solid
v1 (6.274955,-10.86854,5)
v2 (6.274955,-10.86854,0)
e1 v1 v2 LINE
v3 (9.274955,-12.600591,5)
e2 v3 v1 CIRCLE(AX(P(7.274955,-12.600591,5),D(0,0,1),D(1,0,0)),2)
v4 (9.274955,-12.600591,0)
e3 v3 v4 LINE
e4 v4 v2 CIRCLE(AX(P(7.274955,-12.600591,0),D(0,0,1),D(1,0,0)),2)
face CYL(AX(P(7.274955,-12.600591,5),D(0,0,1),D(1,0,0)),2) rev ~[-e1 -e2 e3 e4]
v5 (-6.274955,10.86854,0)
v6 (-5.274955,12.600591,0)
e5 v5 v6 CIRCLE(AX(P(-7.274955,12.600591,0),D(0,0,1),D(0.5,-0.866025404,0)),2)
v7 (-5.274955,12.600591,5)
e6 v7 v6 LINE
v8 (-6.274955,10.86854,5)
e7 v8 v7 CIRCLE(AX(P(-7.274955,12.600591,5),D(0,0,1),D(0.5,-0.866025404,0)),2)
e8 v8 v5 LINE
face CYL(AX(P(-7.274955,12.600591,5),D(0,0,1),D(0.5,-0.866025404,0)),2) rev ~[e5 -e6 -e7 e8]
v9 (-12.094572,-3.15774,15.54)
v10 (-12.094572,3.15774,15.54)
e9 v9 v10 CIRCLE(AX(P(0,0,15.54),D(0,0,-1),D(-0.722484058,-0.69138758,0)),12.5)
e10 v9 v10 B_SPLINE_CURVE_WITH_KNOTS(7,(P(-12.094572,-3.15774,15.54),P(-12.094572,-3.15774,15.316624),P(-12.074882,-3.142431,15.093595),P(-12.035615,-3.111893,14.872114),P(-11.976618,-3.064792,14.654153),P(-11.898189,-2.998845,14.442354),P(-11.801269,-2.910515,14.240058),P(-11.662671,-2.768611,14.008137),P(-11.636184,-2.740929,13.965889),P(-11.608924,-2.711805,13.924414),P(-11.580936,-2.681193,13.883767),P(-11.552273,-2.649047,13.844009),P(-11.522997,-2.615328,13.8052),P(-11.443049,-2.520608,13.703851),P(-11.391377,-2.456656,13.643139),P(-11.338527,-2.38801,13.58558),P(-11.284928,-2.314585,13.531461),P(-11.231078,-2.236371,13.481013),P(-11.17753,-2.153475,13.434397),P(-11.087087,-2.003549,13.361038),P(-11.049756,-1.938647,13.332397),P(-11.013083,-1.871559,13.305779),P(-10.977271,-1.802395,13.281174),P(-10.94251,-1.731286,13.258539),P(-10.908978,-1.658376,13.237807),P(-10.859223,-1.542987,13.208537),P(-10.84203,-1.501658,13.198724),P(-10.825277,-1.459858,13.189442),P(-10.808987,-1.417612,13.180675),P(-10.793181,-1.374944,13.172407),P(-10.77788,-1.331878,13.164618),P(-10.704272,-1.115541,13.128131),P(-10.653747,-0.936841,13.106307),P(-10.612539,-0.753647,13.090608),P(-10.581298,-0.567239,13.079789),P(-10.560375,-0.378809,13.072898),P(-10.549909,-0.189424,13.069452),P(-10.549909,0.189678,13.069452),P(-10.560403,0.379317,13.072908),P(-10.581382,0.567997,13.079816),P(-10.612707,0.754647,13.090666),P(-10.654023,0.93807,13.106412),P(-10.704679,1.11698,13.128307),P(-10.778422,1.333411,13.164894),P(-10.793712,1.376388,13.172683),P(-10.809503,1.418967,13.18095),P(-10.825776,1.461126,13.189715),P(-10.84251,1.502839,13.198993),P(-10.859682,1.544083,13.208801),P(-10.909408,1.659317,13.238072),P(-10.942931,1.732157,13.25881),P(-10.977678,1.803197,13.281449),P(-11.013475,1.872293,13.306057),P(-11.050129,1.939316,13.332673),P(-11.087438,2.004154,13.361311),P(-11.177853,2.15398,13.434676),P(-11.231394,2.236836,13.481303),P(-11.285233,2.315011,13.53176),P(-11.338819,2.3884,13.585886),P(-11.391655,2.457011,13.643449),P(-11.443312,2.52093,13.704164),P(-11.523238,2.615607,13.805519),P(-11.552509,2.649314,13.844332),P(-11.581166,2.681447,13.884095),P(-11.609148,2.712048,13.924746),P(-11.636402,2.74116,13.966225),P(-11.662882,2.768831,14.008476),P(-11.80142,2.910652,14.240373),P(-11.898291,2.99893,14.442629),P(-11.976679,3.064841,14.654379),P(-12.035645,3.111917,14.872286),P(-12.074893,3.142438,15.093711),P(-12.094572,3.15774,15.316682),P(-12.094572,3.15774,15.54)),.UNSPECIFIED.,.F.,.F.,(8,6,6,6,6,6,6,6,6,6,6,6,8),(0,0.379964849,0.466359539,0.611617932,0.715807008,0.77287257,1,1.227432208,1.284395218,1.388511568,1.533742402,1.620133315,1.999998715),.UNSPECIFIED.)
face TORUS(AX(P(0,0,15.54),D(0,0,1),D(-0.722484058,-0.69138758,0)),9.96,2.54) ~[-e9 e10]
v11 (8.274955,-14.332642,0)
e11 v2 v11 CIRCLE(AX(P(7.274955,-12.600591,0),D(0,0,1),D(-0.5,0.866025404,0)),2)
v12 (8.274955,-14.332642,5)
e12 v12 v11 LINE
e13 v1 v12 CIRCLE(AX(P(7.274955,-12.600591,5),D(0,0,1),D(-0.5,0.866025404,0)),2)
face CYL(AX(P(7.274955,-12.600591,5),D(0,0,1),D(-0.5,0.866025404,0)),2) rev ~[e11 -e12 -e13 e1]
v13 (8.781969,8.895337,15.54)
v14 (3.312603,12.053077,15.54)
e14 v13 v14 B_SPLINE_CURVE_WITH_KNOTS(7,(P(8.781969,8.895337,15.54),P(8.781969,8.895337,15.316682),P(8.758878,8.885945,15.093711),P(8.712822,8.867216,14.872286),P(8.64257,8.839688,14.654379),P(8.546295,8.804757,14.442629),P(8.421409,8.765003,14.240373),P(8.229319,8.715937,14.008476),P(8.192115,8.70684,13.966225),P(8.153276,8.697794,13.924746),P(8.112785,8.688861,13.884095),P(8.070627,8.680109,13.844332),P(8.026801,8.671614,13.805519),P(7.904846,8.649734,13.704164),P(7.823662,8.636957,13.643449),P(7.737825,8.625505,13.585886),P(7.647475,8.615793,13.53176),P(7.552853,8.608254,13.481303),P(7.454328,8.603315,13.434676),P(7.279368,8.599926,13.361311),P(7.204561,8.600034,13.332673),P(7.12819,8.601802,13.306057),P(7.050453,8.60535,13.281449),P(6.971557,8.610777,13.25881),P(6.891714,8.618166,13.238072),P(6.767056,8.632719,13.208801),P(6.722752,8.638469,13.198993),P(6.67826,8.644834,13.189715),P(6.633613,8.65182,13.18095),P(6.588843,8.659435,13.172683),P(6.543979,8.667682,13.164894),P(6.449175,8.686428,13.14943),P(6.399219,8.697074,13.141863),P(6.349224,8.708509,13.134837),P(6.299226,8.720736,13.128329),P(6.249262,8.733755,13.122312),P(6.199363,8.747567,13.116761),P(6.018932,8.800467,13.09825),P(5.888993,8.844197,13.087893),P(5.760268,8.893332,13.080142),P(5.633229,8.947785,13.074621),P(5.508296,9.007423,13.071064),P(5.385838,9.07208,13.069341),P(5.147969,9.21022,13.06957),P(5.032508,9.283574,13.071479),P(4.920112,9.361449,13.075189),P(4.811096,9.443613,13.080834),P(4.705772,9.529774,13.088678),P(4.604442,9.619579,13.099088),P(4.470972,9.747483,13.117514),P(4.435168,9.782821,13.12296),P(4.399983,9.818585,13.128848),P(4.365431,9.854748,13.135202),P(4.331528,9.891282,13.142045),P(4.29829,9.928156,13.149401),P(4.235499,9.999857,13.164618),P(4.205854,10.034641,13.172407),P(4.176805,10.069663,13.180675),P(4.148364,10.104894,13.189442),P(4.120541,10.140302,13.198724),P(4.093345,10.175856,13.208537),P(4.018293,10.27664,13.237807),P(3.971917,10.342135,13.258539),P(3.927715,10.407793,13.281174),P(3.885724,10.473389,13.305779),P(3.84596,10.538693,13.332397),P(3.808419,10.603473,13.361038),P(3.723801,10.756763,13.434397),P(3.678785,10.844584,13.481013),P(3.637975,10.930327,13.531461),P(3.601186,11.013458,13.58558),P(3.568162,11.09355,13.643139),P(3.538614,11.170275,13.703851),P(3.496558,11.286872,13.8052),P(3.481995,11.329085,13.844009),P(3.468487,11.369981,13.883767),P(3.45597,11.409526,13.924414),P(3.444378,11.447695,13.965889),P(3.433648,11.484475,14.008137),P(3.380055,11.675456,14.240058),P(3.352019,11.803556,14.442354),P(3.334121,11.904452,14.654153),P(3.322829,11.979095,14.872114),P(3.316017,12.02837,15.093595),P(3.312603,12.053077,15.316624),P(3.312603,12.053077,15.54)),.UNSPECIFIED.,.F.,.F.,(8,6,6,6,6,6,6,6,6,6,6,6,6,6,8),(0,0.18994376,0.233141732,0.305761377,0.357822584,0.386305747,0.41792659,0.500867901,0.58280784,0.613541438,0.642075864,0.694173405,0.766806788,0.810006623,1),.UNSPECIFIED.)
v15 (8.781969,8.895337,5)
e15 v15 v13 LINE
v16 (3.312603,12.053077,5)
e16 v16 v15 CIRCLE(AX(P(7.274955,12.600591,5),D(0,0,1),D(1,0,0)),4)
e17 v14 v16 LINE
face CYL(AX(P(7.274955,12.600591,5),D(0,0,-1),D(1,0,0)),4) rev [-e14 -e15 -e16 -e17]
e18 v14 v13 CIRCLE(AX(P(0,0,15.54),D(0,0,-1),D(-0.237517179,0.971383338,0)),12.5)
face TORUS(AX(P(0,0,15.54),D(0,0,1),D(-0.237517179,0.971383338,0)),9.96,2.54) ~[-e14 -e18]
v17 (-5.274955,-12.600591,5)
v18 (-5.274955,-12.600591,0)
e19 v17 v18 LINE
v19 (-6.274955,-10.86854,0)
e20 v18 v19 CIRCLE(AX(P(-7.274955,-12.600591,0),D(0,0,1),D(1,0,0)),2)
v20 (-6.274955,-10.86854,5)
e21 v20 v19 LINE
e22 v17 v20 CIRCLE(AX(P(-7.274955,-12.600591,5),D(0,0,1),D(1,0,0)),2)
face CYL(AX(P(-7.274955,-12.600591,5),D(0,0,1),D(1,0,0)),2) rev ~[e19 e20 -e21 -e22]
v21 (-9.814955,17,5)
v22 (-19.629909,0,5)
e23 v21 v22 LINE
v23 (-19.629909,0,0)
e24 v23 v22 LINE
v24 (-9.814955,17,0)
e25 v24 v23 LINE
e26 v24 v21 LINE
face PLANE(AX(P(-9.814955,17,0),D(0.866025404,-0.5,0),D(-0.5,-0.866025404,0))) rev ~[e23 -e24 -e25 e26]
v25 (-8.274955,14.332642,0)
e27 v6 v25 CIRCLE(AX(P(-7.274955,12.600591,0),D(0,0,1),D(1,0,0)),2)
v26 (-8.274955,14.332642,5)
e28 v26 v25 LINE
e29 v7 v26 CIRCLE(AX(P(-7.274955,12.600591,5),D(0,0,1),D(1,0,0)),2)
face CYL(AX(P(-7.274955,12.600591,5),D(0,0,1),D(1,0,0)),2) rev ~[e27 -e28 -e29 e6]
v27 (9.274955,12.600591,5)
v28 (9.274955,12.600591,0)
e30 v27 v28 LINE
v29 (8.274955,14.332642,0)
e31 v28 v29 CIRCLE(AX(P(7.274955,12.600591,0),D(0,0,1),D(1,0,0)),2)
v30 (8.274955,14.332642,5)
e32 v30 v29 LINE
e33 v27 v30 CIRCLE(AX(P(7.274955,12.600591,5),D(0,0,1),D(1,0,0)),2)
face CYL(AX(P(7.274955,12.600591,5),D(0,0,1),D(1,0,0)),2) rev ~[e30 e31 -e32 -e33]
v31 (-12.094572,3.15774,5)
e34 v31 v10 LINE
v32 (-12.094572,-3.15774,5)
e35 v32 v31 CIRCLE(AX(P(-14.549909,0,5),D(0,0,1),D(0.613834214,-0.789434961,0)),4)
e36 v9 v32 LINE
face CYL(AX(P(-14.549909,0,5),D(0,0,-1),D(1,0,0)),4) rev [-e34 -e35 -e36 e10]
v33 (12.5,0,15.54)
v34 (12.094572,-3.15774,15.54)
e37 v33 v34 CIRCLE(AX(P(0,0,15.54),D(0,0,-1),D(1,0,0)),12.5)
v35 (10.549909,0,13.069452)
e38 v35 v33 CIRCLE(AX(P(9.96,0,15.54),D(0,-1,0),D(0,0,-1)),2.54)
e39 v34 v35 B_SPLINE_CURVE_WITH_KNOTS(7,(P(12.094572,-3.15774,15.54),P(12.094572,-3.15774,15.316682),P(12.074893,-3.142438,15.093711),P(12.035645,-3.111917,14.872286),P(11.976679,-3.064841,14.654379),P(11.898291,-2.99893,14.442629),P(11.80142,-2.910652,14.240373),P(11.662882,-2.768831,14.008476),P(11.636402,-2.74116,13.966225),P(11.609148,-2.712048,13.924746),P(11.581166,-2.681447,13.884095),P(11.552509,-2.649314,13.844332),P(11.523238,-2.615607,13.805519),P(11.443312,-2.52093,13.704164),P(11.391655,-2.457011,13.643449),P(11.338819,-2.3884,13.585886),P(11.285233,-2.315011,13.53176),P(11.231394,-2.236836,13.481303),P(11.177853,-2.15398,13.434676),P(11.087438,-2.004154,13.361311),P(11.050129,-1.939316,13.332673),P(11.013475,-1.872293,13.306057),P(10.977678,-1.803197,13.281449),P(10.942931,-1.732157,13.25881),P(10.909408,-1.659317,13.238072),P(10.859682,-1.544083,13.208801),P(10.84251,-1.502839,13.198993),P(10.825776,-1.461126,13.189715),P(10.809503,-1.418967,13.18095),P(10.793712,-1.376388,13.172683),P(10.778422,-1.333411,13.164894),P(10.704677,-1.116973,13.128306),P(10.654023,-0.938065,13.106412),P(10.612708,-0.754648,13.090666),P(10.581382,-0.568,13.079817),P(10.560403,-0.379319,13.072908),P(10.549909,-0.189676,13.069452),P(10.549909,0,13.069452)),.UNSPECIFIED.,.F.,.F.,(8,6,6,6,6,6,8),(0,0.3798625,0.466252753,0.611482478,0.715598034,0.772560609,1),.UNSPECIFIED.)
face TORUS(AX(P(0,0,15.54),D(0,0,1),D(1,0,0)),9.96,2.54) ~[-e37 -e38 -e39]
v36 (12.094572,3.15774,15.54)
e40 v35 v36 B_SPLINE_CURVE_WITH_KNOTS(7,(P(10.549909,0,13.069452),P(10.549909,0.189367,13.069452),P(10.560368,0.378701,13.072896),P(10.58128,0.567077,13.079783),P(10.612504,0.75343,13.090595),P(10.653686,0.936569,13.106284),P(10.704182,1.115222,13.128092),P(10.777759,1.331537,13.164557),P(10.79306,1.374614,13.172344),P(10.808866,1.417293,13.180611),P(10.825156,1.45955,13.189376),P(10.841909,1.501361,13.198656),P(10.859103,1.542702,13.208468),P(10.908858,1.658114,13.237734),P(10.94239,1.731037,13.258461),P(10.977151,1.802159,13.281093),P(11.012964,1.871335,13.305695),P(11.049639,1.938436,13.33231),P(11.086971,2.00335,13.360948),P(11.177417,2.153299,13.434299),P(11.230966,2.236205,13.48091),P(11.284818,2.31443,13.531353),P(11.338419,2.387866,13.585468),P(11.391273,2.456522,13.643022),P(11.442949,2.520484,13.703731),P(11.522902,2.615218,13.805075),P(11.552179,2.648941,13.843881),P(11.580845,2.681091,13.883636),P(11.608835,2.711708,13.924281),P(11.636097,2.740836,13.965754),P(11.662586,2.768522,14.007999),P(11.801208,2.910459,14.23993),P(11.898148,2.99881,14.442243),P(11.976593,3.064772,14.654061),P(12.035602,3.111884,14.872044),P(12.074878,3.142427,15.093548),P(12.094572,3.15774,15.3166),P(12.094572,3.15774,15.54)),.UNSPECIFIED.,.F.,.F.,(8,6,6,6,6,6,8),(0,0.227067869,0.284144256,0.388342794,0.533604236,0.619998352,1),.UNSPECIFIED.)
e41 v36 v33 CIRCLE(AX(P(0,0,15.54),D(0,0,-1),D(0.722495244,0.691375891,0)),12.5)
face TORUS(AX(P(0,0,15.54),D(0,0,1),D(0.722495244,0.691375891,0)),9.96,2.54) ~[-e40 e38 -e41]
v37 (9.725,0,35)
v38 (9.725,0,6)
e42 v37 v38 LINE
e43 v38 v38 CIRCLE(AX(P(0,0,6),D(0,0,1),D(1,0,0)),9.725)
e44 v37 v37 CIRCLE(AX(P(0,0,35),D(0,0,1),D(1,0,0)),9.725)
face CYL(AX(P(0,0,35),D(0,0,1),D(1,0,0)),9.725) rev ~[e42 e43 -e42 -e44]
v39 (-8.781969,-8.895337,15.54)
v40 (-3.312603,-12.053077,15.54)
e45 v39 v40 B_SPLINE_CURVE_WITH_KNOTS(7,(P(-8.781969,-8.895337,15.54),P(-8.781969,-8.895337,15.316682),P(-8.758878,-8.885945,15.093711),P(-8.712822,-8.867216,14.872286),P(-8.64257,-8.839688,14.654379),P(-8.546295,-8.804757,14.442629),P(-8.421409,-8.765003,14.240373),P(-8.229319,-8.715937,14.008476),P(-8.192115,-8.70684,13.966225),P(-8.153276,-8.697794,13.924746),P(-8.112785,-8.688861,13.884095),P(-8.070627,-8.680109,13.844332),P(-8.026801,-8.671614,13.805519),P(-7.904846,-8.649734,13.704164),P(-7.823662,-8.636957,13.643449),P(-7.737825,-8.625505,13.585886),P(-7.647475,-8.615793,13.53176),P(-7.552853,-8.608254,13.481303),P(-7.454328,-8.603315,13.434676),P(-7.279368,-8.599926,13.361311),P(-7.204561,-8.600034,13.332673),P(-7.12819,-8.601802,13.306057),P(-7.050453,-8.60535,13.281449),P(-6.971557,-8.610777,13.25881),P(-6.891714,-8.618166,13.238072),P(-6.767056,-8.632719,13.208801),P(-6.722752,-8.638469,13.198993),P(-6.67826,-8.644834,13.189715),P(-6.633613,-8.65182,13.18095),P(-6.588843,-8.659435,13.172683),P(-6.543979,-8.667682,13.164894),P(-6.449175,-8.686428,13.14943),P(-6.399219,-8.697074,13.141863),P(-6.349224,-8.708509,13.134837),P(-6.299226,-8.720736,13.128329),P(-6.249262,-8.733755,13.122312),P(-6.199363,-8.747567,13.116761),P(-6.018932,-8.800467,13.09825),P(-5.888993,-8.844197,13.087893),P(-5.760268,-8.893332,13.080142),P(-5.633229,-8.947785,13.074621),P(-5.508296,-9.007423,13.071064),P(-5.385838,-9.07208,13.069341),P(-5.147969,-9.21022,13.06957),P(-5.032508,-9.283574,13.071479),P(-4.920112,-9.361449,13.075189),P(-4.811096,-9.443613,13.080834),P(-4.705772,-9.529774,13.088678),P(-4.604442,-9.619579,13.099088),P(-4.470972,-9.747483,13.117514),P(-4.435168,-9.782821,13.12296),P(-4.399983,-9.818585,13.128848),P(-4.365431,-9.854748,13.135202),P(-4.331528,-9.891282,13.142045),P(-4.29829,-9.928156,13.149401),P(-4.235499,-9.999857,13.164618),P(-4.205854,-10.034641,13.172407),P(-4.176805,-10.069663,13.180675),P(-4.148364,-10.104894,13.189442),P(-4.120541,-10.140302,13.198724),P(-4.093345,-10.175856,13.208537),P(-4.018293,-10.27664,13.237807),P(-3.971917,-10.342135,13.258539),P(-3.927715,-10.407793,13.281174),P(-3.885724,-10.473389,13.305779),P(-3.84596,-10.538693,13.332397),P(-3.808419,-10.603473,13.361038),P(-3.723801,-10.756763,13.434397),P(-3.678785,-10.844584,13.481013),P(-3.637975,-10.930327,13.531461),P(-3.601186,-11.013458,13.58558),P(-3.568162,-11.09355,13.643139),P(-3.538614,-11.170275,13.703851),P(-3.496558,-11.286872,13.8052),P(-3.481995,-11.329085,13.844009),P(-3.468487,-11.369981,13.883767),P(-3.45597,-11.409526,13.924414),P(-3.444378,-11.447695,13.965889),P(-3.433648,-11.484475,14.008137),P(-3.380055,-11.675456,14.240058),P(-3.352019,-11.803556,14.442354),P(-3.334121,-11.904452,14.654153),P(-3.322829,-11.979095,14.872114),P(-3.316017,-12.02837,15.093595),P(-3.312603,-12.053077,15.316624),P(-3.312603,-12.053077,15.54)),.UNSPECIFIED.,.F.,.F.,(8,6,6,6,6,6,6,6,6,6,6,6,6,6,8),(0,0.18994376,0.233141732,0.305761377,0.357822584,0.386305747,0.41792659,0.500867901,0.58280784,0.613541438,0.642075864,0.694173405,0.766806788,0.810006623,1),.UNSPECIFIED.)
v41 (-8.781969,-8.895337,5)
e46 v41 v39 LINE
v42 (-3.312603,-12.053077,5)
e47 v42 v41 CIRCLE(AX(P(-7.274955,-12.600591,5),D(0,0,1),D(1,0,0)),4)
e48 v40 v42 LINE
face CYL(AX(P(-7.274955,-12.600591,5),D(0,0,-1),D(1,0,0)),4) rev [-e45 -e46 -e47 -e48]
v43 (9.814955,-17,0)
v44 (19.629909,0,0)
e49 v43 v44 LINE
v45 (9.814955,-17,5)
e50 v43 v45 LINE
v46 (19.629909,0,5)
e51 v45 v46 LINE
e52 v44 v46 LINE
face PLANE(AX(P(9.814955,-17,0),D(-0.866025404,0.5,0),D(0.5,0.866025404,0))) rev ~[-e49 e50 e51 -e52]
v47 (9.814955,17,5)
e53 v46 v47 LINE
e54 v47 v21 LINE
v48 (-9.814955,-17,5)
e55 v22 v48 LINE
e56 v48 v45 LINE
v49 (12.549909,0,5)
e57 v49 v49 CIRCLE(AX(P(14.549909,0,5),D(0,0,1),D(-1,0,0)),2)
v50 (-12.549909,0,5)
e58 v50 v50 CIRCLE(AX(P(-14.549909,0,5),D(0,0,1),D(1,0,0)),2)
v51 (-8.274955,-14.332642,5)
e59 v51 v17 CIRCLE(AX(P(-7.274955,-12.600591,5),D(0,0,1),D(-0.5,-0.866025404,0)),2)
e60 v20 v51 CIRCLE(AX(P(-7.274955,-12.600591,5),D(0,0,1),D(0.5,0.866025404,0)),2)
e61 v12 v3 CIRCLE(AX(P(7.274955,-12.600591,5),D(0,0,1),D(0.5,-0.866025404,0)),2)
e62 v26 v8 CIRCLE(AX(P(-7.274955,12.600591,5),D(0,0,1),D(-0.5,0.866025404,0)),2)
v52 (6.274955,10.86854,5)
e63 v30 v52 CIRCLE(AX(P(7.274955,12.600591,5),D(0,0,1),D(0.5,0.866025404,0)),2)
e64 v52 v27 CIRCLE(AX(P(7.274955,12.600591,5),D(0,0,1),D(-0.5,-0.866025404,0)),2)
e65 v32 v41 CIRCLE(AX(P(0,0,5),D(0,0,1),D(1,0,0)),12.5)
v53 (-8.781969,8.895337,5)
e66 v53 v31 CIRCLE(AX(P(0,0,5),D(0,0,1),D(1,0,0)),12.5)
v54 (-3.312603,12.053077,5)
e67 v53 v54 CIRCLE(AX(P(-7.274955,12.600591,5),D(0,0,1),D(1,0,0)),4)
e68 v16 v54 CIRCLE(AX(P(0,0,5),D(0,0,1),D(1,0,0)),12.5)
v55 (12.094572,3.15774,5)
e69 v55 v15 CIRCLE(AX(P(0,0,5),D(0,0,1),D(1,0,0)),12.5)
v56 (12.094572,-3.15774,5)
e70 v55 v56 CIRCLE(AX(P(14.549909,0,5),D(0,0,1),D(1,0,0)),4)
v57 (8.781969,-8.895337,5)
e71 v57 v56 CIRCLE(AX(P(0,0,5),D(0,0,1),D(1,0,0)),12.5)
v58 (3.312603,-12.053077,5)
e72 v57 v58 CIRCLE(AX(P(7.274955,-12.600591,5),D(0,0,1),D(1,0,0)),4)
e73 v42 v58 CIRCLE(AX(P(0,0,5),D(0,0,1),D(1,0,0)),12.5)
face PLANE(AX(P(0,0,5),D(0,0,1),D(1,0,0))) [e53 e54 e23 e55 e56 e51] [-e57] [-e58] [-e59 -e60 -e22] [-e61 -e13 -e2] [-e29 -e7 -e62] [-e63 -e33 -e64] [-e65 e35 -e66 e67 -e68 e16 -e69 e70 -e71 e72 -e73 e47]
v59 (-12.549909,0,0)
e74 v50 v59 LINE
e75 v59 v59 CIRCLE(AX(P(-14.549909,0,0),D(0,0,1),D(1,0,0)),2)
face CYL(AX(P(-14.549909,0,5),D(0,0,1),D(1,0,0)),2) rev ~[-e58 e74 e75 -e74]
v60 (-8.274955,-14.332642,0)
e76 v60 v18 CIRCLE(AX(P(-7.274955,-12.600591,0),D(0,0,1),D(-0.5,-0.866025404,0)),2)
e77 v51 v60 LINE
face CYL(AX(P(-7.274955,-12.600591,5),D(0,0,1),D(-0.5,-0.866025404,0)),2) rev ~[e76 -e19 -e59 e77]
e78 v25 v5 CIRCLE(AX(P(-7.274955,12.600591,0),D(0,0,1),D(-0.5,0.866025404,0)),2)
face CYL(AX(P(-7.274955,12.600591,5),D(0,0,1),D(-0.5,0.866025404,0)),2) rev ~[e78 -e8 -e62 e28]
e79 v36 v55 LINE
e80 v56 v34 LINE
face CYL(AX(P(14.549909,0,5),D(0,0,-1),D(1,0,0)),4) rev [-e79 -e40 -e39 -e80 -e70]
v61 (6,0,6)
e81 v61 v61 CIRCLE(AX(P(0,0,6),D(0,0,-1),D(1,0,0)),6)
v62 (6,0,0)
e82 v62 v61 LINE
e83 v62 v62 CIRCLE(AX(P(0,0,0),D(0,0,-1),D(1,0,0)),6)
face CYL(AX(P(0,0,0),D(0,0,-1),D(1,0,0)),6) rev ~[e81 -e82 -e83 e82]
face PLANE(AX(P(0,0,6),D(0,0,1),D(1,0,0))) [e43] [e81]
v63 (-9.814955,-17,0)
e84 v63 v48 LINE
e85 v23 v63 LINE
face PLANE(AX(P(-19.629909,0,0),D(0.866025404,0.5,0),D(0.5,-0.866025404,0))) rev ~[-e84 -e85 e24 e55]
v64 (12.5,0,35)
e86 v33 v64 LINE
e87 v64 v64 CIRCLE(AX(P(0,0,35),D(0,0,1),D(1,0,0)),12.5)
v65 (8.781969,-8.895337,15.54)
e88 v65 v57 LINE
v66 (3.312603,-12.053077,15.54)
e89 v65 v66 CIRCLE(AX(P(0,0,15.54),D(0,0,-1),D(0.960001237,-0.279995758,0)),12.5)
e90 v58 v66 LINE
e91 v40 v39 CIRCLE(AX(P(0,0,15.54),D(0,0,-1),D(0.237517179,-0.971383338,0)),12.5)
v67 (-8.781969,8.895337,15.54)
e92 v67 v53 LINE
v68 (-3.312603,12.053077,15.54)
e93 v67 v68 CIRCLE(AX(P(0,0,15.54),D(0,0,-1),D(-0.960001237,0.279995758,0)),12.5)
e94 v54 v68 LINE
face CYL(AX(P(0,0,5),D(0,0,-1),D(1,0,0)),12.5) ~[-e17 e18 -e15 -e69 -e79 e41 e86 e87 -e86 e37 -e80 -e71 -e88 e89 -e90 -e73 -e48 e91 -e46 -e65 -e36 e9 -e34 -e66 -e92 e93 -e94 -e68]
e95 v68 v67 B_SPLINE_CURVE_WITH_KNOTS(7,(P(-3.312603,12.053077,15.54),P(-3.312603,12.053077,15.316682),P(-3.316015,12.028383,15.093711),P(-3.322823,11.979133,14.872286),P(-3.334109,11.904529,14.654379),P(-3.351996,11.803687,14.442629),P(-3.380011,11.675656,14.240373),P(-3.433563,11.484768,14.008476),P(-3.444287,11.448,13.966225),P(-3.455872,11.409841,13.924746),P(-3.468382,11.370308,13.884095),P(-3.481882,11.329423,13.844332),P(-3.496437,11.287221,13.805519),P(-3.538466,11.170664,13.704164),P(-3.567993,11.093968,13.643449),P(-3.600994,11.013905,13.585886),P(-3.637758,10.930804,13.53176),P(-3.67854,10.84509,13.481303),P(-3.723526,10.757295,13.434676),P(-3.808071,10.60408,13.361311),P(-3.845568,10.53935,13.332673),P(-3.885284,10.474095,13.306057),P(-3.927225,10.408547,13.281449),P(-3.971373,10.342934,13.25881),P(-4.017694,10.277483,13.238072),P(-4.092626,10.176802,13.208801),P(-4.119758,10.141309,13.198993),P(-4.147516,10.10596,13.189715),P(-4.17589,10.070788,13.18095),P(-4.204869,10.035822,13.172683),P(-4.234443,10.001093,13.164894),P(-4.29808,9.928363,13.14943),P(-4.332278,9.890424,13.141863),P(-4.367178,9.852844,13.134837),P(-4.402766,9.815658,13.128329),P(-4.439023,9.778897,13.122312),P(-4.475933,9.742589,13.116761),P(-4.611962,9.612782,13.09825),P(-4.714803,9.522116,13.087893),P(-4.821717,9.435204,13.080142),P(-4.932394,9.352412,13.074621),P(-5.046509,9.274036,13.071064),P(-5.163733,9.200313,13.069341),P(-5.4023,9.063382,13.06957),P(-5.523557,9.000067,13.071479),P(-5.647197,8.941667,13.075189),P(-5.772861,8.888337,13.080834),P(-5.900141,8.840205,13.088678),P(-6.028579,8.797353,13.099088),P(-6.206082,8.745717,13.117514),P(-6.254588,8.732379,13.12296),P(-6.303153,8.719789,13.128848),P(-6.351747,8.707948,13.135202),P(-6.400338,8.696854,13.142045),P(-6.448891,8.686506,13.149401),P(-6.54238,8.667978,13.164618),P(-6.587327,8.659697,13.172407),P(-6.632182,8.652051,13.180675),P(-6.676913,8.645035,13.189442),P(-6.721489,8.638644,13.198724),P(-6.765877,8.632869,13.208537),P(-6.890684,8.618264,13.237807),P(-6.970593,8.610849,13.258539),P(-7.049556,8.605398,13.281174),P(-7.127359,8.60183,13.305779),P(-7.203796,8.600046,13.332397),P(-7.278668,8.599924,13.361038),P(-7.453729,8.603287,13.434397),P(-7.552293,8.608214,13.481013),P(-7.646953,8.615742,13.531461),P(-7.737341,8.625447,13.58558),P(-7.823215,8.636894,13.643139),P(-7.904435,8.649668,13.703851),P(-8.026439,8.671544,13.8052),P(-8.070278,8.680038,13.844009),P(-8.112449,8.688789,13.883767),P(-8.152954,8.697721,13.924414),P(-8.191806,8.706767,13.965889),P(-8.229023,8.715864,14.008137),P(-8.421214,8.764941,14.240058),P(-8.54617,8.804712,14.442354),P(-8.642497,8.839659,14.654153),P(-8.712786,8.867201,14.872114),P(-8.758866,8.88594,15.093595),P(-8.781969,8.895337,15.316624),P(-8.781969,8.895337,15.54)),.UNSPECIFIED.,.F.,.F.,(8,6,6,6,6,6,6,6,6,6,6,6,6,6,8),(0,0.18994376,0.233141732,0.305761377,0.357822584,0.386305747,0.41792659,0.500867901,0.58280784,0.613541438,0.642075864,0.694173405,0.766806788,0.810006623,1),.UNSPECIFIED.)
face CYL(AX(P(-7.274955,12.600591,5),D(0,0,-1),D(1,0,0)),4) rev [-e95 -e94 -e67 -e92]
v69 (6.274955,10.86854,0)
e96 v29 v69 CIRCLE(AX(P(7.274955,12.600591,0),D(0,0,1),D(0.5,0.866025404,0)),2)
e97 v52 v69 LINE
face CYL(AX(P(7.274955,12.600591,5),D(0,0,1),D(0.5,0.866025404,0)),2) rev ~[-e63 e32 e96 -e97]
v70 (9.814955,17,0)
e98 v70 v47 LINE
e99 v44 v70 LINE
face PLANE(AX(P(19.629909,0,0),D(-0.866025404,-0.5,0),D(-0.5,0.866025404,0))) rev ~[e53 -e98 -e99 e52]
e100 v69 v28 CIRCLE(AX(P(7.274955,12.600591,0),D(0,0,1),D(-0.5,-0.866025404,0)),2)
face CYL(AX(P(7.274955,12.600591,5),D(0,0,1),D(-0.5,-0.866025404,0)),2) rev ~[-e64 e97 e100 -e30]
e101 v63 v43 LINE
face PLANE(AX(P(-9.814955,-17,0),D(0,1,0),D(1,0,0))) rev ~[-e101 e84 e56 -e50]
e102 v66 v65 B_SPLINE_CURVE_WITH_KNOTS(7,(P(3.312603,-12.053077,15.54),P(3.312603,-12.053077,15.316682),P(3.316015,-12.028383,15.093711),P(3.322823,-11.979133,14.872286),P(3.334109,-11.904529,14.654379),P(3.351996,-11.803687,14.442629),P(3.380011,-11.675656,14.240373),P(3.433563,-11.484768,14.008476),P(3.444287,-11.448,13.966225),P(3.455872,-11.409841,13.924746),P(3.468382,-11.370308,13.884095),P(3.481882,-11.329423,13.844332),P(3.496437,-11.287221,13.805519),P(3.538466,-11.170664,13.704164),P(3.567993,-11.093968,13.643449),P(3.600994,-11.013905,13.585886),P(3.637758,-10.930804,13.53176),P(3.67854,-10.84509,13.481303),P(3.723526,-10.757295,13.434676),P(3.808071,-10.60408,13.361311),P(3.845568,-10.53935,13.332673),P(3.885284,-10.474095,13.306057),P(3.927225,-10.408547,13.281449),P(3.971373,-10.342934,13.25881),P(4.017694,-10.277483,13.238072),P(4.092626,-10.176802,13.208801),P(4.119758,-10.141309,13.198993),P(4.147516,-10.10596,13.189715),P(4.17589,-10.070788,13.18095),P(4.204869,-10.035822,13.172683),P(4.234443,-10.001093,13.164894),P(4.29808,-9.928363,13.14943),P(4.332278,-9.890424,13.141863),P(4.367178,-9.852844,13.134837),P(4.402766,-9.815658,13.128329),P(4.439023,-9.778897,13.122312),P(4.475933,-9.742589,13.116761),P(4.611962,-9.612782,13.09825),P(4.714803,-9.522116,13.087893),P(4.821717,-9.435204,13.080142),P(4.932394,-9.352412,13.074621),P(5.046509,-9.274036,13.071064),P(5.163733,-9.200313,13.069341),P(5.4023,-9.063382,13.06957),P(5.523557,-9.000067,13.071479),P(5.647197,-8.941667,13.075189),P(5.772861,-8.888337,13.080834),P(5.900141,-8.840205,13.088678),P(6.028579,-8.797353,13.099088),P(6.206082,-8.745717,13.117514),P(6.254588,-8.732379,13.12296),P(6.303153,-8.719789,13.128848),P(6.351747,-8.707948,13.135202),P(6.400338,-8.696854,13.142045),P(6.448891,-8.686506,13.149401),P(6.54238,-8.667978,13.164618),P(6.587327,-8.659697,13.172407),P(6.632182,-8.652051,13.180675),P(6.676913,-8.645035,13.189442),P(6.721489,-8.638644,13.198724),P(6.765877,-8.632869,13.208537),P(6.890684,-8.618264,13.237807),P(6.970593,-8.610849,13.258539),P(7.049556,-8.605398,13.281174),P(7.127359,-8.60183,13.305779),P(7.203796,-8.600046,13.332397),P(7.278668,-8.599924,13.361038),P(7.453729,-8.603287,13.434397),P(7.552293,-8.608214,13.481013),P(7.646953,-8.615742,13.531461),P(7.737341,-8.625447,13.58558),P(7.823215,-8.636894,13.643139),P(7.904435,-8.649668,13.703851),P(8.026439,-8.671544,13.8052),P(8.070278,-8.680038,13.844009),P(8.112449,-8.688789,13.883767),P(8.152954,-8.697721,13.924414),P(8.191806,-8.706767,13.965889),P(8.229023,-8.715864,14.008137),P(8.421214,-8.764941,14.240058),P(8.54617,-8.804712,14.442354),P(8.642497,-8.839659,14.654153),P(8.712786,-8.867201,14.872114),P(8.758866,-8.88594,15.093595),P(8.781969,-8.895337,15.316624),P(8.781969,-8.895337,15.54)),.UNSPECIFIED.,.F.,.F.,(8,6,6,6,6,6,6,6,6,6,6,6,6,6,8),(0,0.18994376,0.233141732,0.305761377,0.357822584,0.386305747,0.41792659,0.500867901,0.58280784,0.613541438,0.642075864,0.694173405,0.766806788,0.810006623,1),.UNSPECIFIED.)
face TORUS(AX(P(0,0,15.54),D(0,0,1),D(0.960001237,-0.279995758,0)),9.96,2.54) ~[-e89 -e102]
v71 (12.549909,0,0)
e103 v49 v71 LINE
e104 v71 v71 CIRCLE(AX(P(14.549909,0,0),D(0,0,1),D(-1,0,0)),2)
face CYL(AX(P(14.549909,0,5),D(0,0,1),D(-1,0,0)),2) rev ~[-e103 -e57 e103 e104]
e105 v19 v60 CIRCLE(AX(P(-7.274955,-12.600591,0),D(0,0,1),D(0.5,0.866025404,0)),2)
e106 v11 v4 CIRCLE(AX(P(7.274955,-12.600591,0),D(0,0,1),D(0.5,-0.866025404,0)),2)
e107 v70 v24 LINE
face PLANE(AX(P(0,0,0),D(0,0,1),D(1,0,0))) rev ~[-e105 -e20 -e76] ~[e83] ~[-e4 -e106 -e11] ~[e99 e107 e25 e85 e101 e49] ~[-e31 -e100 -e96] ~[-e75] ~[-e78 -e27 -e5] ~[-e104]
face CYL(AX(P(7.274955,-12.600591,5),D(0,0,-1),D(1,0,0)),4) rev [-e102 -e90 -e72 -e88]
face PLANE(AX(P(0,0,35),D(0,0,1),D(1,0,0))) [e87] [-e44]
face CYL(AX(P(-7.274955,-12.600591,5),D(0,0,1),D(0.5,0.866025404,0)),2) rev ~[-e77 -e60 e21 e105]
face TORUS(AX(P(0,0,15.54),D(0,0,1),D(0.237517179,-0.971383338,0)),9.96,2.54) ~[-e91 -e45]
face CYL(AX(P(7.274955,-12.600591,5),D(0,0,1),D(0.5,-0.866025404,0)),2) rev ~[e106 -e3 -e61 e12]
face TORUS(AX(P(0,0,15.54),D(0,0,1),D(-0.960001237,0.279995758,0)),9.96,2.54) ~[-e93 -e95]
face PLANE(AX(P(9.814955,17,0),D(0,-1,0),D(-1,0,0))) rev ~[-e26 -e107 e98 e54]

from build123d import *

# Parameters (mm, degrees)
F1_DEPTH      = 5
F2_R          = 12.5
F3_DEPTH      = 30
F4_R          = 9.725
F5_DEPTH      = 29
F6_R          = 6
F7_DEPTH      = 25.4
F9_DEPTH      = 25.4
F10_R         = 4
F11_DEPTH     = 8
F12_T4_ANGLE  = 87.4800969246
F12_S5_R      = 4
F12_T6_DEPTH  = 12
F12_T10_ANGLE = 87.4800969246
F12_S11_R     = 4
F12_T12_DEPTH = 11
F12_T16_ANGLE = 87.4800969246
F12_S17_R     = 4
F12_T18_DEPTH = 11
F12_T22_ANGLE = 43.739121488
F12_S23_R     = 4
F12_T24_DEPTH = 8
F12_T28_ANGLE = 43.739121488
F12_S29_R     = 4
F12_T30_DEPTH = 8
F12_T34_ANGLE = 87.4800969246
F12_S35_R     = 4
F12_T36_DEPTH = 11
F12_T40_ANGLE = 87.4800969246
F12_S41_R     = 4
F12_T42_DEPTH = 11


# Not quite as in the source:
# - a fillet or chamfer that OpenCascade refuses, or shapes differently, is made with other operations: its cross-section is extruded or revolved along the edge and cut away or added


with BuildPart() as f1:
    # F0 (on Top) → F1 (new body)
    with BuildSketch(Plane.XY):
        Polygon((9.8149545762, 17), (-9.8149545762, 17), (-19.6299091524, 0), (-9.8149545762, -17), (9.8149545762, -17), (19.6299091524, 0), align=None)
    extrude(amount=F1_DEPTH)

    # F2 (on face) → F3 (join)
    with BuildSketch(Plane.XY.offset(5)):
        Circle(F2_R)
    extrude(amount=F3_DEPTH)

    # F4 (on face) → F5 (cut)
    with BuildSketch(Plane.XY.offset(35)):
        Circle(F4_R)
    extrude(amount=-F5_DEPTH, mode=Mode.SUBTRACT)

    # F6 (on face) → F7 (cut)
    with BuildSketch(Plane(origin=(0, 0, 0), x_dir=(1, 0, 0), z_dir=(0, 0, -1))):
        Circle(F6_R)
    extrude(amount=-F7_DEPTH, mode=Mode.SUBTRACT)

    # F8 (on face) → F9 (cut)
    with BuildSketch(Plane.XY.offset(5)):
        with BuildLine():
            ThreePointArc((-6.2749545762, 10.8685401412), (-5.5429037687, 11.6005909488), (-5.2749545762, 12.6005909488))
            ThreePointArc((-5.2749545762, 12.6005909488), (-6.2749545762, 14.3326417563), (-8.2749545762, 14.3326417563))
            Line((-8.2749545762, 14.3326417563), (-6.2749545762, 10.8685401412))
        make_face()
        with BuildLine():
            ThreePointArc((8.2749545762, 14.3326417563), (5.5429037687, 13.6005909488), (6.2749545762, 10.8685401412))
            Line((6.2749545762, 10.8685401412), (8.2749545762, 14.3326417563))
        make_face()
        with BuildLine():
            Line((8.2749545762, 14.3326417563), (6.2749545762, 10.8685401412))
            ThreePointArc((6.2749545762, 10.8685401412), (8.2749545762, 10.8685401412), (9.2749545762, 12.6005909488))
            ThreePointArc((9.2749545762, 12.6005909488), (9.0070053838, 13.6005909488), (8.2749545762, 14.3326417563))
        make_face()
        with BuildLine():
            ThreePointArc((16.5499091524, 0), (14.5499091524, 2), (12.5499091524, 0))
            Line((12.5499091524, 0), (16.5499091524, 0))
        make_face()
        with BuildLine():
            Line((16.5499091524, 0), (12.5499091524, 0))
            ThreePointArc((12.5499091524, 0), (14.5499091524, -2), (16.5499091524, 0))
        make_face()
        with BuildLine():
            ThreePointArc((9.2749545762, -12.6005909488), (8.2749545762, -10.8685401412), (6.2749545762, -10.8685401412))
            Line((6.2749545762, -10.8685401412), (8.2749545762, -14.3326417563))
            ThreePointArc((8.2749545762, -14.3326417563), (9.0070053838, -13.6005909488), (9.2749545762, -12.6005909488))
        make_face()
        with BuildLine():
            Line((8.2749545762, -14.3326417563), (6.2749545762, -10.8685401412))
            ThreePointArc((6.2749545762, -10.8685401412), (5.5429037687, -13.6005909488), (8.2749545762, -14.3326417563))
        make_face()
        with BuildLine():
            ThreePointArc((-5.2749545762, -12.6005909488), (-5.5429037687, -11.6005909488), (-6.2749545762, -10.8685401412))
            Line((-6.2749545762, -10.8685401412), (-8.2749545762, -14.3326417563))
            ThreePointArc((-8.2749545762, -14.3326417563), (-6.2749545762, -14.3326417563), (-5.2749545762, -12.6005909488))
        make_face()
        with BuildLine():
            Line((-8.2749545762, -14.3326417563), (-6.2749545762, -10.8685401412))
            ThreePointArc((-6.2749545762, -10.8685401412), (-9.0070053838, -11.6005909488), (-8.2749545762, -14.3326417563))
        make_face()
        with BuildLine():
            ThreePointArc((-16.5499091524, 0), (-14.5499091524, -2), (-12.5499091524, 0))
            Line((-12.5499091524, 0), (-16.5499091524, 0))
        make_face()
        with BuildLine():
            Line((-16.5499091524, 0), (-12.5499091524, 0))
            ThreePointArc((-12.5499091524, 0), (-14.5499091524, 2), (-16.5499091524, 0))
        make_face()
        with BuildLine():
            Line((-6.2749545762, 10.8685401412), (-8.2749545762, 14.3326417563))
            ThreePointArc((-8.2749545762, 14.3326417563), (-9.0070053838, 11.6005909488), (-6.2749545762, 10.8685401412))
        make_face()
    extrude(amount=-F9_DEPTH, mode=Mode.SUBTRACT)

    # F10 (on face) → F11 (cut)
    with BuildSketch(Plane.XY.offset(5)):
        with Locations((-7.2749545762, -12.6005909488)):
            Circle(F10_R)
        with Locations((-14.5499091524, 0)):
            Circle(F10_R)
        with Locations((-7.2749545762, 12.6005909488)):
            Circle(F10_R)
        with Locations((7.2749545762, 12.6005909488)):
            Circle(F10_R)
        with Locations((14.5499091524, 0)):
            Circle(F10_R)
        with Locations((7.2749545762, -12.6005909488)):
            Circle(F10_R)
    extrude(amount=F11_DEPTH, mode=Mode.SUBTRACT)

    # F12: fillet of radius 2.54 on 7 edges, made by hand


with BuildPart() as f12_tool2:
    # F12_s3 → F12_t4 (revolve)
    with BuildSketch(Plane(origin=(0, 0, 0), x_dir=(0, 0, 1), z_dir=(0.6913875801, -0.7224840581, 0))):
        with BuildLine():
            ThreePointArc((13, 9.96), (13.7439487758, 11.7560512242), (15.54, 12.5))
            Line((15.54, 12.5), (13, 12.5))
            Line((13, 12.5), (13, 9.96))
        make_face()
    revolve(axis=Axis((0, 0, 13), (0, 0, -1)), revolution_arc=F12_T4_ANGLE)

    # F12_s5 → F12_t6 (intersect, symmetric)
    with BuildSketch(Plane.XY.offset(15.2)):
        with Locations((-14.5499091524, 0)):
            Circle(F12_S5_R)
    extrude(amount=F12_T6_DEPTH, both=True, mode=Mode.INTERSECT)


with BuildPart() as f1_1:
    add(f1.part)

    # F12_t1: cut F12_tool2
    add(f12_tool2.part, mode=Mode.SUBTRACT)


with BuildPart() as f12_tool8:
    # F12_s9 → F12_t10 (revolve)
    with BuildSketch(Plane(origin=(0, 0, 0), x_dir=(0, 0, 1), z_dir=(0.9713833381, 0.2375171792, 0))):
        with BuildLine():
            ThreePointArc((13, 9.96), (13.7439487758, 11.7560512242), (15.54, 12.5))
            Line((15.54, 12.5), (13, 12.5))
            Line((13, 12.5), (13, 9.96))
        make_face()
    revolve(axis=Axis((0, 0, 13), (0, 0, -1)), revolution_arc=F12_T10_ANGLE)

    # F12_s11 → F12_t12 (intersect, symmetric)
    with BuildSketch(Plane.XY.offset(15.2)):
        with Locations((-7.2749545762, -12.6005909488)):
            Circle(F12_S11_R)
    extrude(amount=F12_T12_DEPTH, both=True, mode=Mode.INTERSECT)


with BuildPart() as f1_2:
    add(f1_1.part)

    # F12_t7: cut F12_tool8
    add(f12_tool8.part, mode=Mode.SUBTRACT)


with BuildPart() as f12_tool14:
    # F12_s15 → F12_t16 (revolve)
    with BuildSketch(Plane(origin=(0, 0, 0), x_dir=(0, 0, 1), z_dir=(0.2799957581, 0.9600012372, 0))):
        with BuildLine():
            ThreePointArc((13, 9.96), (13.7439487758, 11.7560512242), (15.54, 12.5))
            Line((15.54, 12.5), (13, 12.5))
            Line((13, 12.5), (13, 9.96))
        make_face()
    revolve(axis=Axis((0, 0, 13), (0, 0, -1)), revolution_arc=F12_T16_ANGLE)

    # F12_s17 → F12_t18 (intersect, symmetric)
    with BuildSketch(Plane.XY.offset(15.2)):
        with Locations((7.2749545762, -12.6005909488)):
            Circle(F12_S17_R)
    extrude(amount=F12_T18_DEPTH, both=True, mode=Mode.INTERSECT)


with BuildPart() as f1_3:
    add(f1_2.part)

    # F12_t13: cut F12_tool14
    add(f12_tool14.part, mode=Mode.SUBTRACT)


with BuildPart() as f12_tool20:
    # F12_s21 → F12_t22 (revolve)
    with BuildSketch(Plane(origin=(0, 0, 0), x_dir=(0, 0, 1), z_dir=(-0.6913758911, 0.7224952438, 0))):
        with BuildLine():
            ThreePointArc((13, 9.96), (13.7439487758, 11.7560512242), (15.54, 12.5))
            Line((15.54, 12.5), (13, 12.5))
            Line((13, 12.5), (13, 9.96))
        make_face()
    revolve(axis=Axis((0, 0, 13), (0, 0, -1)), revolution_arc=F12_T22_ANGLE)

    # F12_s23 → F12_t24 (intersect, symmetric)
    with BuildSketch(Plane.XY.offset(15.2)):
        with Locations((14.5499091524, 0)):
            Circle(F12_S23_R)
    extrude(amount=F12_T24_DEPTH, both=True, mode=Mode.INTERSECT)


with BuildPart() as f1_4:
    add(f1_3.part)

    # F12_t19: cut F12_tool20
    add(f12_tool20.part, mode=Mode.SUBTRACT)


with BuildPart() as f12_tool26:
    # F12_s27 → F12_t28 (revolve)
    with BuildSketch(Plane.XZ):
        with BuildLine():
            ThreePointArc((9.96, 13), (11.7560512242, 13.7439487758), (12.5, 15.54))
            Line((12.5, 15.54), (12.5, 13))
            Line((12.5, 13), (9.96, 13))
        make_face()
    revolve(axis=Axis((0, 0, 13), (0, 0, -1)), revolution_arc=F12_T28_ANGLE)

    # F12_s29 → F12_t30 (intersect, symmetric)
    with BuildSketch(Plane.XY.offset(15.2)):
        with Locations((14.5499091524, 0)):
            Circle(F12_S29_R)
    extrude(amount=F12_T30_DEPTH, both=True, mode=Mode.INTERSECT)


with BuildPart() as f1_5:
    add(f1_4.part)

    # F12_t25: cut F12_tool26
    add(f12_tool26.part, mode=Mode.SUBTRACT)


with BuildPart() as f12_tool32:
    # F12_s33 → F12_t34 (revolve)
    with BuildSketch(Plane(origin=(0, 0, 0), x_dir=(0, 0, 1), z_dir=(-0.9713833381, -0.2375171792, 0))):
        with BuildLine():
            ThreePointArc((13, 9.96), (13.7439487758, 11.7560512242), (15.54, 12.5))
            Line((15.54, 12.5), (13, 12.5))
            Line((13, 12.5), (13, 9.96))
        make_face()
    revolve(axis=Axis((0, 0, 13), (0, 0, -1)), revolution_arc=F12_T34_ANGLE)

    # F12_s35 → F12_t36 (intersect, symmetric)
    with BuildSketch(Plane.XY.offset(15.2)):
        with Locations((7.2749545762, 12.6005909488)):
            Circle(F12_S35_R)
    extrude(amount=F12_T36_DEPTH, both=True, mode=Mode.INTERSECT)


with BuildPart() as f1_6:
    add(f1_5.part)

    # F12_t31: cut F12_tool32
    add(f12_tool32.part, mode=Mode.SUBTRACT)


with BuildPart() as f12_tool38:
    # F12_s39 → F12_t40 (revolve)
    with BuildSketch(Plane(origin=(0, 0, 0), x_dir=(0, 0, 1), z_dir=(-0.2799957581, -0.9600012372, 0))):
        with BuildLine():
            ThreePointArc((13, 9.96), (13.7439487758, 11.7560512242), (15.54, 12.5))
            Line((15.54, 12.5), (13, 12.5))
            Line((13, 12.5), (13, 9.96))
        make_face()
    revolve(axis=Axis((0, 0, 13), (0, 0, -1)), revolution_arc=F12_T40_ANGLE)

    # F12_s41 → F12_t42 (intersect, symmetric)
    with BuildSketch(Plane.XY.offset(15.2)):
        with Locations((-7.2749545762, 12.6005909488)):
            Circle(F12_S41_R)
    extrude(amount=F12_T42_DEPTH, both=True, mode=Mode.INTERSECT)


with BuildPart() as f1_7:
    add(f1_6.part)

    # F12_t37: cut F12_tool38
    add(f12_tool38.part, mode=Mode.SUBTRACT)


solid = f1_7.part
